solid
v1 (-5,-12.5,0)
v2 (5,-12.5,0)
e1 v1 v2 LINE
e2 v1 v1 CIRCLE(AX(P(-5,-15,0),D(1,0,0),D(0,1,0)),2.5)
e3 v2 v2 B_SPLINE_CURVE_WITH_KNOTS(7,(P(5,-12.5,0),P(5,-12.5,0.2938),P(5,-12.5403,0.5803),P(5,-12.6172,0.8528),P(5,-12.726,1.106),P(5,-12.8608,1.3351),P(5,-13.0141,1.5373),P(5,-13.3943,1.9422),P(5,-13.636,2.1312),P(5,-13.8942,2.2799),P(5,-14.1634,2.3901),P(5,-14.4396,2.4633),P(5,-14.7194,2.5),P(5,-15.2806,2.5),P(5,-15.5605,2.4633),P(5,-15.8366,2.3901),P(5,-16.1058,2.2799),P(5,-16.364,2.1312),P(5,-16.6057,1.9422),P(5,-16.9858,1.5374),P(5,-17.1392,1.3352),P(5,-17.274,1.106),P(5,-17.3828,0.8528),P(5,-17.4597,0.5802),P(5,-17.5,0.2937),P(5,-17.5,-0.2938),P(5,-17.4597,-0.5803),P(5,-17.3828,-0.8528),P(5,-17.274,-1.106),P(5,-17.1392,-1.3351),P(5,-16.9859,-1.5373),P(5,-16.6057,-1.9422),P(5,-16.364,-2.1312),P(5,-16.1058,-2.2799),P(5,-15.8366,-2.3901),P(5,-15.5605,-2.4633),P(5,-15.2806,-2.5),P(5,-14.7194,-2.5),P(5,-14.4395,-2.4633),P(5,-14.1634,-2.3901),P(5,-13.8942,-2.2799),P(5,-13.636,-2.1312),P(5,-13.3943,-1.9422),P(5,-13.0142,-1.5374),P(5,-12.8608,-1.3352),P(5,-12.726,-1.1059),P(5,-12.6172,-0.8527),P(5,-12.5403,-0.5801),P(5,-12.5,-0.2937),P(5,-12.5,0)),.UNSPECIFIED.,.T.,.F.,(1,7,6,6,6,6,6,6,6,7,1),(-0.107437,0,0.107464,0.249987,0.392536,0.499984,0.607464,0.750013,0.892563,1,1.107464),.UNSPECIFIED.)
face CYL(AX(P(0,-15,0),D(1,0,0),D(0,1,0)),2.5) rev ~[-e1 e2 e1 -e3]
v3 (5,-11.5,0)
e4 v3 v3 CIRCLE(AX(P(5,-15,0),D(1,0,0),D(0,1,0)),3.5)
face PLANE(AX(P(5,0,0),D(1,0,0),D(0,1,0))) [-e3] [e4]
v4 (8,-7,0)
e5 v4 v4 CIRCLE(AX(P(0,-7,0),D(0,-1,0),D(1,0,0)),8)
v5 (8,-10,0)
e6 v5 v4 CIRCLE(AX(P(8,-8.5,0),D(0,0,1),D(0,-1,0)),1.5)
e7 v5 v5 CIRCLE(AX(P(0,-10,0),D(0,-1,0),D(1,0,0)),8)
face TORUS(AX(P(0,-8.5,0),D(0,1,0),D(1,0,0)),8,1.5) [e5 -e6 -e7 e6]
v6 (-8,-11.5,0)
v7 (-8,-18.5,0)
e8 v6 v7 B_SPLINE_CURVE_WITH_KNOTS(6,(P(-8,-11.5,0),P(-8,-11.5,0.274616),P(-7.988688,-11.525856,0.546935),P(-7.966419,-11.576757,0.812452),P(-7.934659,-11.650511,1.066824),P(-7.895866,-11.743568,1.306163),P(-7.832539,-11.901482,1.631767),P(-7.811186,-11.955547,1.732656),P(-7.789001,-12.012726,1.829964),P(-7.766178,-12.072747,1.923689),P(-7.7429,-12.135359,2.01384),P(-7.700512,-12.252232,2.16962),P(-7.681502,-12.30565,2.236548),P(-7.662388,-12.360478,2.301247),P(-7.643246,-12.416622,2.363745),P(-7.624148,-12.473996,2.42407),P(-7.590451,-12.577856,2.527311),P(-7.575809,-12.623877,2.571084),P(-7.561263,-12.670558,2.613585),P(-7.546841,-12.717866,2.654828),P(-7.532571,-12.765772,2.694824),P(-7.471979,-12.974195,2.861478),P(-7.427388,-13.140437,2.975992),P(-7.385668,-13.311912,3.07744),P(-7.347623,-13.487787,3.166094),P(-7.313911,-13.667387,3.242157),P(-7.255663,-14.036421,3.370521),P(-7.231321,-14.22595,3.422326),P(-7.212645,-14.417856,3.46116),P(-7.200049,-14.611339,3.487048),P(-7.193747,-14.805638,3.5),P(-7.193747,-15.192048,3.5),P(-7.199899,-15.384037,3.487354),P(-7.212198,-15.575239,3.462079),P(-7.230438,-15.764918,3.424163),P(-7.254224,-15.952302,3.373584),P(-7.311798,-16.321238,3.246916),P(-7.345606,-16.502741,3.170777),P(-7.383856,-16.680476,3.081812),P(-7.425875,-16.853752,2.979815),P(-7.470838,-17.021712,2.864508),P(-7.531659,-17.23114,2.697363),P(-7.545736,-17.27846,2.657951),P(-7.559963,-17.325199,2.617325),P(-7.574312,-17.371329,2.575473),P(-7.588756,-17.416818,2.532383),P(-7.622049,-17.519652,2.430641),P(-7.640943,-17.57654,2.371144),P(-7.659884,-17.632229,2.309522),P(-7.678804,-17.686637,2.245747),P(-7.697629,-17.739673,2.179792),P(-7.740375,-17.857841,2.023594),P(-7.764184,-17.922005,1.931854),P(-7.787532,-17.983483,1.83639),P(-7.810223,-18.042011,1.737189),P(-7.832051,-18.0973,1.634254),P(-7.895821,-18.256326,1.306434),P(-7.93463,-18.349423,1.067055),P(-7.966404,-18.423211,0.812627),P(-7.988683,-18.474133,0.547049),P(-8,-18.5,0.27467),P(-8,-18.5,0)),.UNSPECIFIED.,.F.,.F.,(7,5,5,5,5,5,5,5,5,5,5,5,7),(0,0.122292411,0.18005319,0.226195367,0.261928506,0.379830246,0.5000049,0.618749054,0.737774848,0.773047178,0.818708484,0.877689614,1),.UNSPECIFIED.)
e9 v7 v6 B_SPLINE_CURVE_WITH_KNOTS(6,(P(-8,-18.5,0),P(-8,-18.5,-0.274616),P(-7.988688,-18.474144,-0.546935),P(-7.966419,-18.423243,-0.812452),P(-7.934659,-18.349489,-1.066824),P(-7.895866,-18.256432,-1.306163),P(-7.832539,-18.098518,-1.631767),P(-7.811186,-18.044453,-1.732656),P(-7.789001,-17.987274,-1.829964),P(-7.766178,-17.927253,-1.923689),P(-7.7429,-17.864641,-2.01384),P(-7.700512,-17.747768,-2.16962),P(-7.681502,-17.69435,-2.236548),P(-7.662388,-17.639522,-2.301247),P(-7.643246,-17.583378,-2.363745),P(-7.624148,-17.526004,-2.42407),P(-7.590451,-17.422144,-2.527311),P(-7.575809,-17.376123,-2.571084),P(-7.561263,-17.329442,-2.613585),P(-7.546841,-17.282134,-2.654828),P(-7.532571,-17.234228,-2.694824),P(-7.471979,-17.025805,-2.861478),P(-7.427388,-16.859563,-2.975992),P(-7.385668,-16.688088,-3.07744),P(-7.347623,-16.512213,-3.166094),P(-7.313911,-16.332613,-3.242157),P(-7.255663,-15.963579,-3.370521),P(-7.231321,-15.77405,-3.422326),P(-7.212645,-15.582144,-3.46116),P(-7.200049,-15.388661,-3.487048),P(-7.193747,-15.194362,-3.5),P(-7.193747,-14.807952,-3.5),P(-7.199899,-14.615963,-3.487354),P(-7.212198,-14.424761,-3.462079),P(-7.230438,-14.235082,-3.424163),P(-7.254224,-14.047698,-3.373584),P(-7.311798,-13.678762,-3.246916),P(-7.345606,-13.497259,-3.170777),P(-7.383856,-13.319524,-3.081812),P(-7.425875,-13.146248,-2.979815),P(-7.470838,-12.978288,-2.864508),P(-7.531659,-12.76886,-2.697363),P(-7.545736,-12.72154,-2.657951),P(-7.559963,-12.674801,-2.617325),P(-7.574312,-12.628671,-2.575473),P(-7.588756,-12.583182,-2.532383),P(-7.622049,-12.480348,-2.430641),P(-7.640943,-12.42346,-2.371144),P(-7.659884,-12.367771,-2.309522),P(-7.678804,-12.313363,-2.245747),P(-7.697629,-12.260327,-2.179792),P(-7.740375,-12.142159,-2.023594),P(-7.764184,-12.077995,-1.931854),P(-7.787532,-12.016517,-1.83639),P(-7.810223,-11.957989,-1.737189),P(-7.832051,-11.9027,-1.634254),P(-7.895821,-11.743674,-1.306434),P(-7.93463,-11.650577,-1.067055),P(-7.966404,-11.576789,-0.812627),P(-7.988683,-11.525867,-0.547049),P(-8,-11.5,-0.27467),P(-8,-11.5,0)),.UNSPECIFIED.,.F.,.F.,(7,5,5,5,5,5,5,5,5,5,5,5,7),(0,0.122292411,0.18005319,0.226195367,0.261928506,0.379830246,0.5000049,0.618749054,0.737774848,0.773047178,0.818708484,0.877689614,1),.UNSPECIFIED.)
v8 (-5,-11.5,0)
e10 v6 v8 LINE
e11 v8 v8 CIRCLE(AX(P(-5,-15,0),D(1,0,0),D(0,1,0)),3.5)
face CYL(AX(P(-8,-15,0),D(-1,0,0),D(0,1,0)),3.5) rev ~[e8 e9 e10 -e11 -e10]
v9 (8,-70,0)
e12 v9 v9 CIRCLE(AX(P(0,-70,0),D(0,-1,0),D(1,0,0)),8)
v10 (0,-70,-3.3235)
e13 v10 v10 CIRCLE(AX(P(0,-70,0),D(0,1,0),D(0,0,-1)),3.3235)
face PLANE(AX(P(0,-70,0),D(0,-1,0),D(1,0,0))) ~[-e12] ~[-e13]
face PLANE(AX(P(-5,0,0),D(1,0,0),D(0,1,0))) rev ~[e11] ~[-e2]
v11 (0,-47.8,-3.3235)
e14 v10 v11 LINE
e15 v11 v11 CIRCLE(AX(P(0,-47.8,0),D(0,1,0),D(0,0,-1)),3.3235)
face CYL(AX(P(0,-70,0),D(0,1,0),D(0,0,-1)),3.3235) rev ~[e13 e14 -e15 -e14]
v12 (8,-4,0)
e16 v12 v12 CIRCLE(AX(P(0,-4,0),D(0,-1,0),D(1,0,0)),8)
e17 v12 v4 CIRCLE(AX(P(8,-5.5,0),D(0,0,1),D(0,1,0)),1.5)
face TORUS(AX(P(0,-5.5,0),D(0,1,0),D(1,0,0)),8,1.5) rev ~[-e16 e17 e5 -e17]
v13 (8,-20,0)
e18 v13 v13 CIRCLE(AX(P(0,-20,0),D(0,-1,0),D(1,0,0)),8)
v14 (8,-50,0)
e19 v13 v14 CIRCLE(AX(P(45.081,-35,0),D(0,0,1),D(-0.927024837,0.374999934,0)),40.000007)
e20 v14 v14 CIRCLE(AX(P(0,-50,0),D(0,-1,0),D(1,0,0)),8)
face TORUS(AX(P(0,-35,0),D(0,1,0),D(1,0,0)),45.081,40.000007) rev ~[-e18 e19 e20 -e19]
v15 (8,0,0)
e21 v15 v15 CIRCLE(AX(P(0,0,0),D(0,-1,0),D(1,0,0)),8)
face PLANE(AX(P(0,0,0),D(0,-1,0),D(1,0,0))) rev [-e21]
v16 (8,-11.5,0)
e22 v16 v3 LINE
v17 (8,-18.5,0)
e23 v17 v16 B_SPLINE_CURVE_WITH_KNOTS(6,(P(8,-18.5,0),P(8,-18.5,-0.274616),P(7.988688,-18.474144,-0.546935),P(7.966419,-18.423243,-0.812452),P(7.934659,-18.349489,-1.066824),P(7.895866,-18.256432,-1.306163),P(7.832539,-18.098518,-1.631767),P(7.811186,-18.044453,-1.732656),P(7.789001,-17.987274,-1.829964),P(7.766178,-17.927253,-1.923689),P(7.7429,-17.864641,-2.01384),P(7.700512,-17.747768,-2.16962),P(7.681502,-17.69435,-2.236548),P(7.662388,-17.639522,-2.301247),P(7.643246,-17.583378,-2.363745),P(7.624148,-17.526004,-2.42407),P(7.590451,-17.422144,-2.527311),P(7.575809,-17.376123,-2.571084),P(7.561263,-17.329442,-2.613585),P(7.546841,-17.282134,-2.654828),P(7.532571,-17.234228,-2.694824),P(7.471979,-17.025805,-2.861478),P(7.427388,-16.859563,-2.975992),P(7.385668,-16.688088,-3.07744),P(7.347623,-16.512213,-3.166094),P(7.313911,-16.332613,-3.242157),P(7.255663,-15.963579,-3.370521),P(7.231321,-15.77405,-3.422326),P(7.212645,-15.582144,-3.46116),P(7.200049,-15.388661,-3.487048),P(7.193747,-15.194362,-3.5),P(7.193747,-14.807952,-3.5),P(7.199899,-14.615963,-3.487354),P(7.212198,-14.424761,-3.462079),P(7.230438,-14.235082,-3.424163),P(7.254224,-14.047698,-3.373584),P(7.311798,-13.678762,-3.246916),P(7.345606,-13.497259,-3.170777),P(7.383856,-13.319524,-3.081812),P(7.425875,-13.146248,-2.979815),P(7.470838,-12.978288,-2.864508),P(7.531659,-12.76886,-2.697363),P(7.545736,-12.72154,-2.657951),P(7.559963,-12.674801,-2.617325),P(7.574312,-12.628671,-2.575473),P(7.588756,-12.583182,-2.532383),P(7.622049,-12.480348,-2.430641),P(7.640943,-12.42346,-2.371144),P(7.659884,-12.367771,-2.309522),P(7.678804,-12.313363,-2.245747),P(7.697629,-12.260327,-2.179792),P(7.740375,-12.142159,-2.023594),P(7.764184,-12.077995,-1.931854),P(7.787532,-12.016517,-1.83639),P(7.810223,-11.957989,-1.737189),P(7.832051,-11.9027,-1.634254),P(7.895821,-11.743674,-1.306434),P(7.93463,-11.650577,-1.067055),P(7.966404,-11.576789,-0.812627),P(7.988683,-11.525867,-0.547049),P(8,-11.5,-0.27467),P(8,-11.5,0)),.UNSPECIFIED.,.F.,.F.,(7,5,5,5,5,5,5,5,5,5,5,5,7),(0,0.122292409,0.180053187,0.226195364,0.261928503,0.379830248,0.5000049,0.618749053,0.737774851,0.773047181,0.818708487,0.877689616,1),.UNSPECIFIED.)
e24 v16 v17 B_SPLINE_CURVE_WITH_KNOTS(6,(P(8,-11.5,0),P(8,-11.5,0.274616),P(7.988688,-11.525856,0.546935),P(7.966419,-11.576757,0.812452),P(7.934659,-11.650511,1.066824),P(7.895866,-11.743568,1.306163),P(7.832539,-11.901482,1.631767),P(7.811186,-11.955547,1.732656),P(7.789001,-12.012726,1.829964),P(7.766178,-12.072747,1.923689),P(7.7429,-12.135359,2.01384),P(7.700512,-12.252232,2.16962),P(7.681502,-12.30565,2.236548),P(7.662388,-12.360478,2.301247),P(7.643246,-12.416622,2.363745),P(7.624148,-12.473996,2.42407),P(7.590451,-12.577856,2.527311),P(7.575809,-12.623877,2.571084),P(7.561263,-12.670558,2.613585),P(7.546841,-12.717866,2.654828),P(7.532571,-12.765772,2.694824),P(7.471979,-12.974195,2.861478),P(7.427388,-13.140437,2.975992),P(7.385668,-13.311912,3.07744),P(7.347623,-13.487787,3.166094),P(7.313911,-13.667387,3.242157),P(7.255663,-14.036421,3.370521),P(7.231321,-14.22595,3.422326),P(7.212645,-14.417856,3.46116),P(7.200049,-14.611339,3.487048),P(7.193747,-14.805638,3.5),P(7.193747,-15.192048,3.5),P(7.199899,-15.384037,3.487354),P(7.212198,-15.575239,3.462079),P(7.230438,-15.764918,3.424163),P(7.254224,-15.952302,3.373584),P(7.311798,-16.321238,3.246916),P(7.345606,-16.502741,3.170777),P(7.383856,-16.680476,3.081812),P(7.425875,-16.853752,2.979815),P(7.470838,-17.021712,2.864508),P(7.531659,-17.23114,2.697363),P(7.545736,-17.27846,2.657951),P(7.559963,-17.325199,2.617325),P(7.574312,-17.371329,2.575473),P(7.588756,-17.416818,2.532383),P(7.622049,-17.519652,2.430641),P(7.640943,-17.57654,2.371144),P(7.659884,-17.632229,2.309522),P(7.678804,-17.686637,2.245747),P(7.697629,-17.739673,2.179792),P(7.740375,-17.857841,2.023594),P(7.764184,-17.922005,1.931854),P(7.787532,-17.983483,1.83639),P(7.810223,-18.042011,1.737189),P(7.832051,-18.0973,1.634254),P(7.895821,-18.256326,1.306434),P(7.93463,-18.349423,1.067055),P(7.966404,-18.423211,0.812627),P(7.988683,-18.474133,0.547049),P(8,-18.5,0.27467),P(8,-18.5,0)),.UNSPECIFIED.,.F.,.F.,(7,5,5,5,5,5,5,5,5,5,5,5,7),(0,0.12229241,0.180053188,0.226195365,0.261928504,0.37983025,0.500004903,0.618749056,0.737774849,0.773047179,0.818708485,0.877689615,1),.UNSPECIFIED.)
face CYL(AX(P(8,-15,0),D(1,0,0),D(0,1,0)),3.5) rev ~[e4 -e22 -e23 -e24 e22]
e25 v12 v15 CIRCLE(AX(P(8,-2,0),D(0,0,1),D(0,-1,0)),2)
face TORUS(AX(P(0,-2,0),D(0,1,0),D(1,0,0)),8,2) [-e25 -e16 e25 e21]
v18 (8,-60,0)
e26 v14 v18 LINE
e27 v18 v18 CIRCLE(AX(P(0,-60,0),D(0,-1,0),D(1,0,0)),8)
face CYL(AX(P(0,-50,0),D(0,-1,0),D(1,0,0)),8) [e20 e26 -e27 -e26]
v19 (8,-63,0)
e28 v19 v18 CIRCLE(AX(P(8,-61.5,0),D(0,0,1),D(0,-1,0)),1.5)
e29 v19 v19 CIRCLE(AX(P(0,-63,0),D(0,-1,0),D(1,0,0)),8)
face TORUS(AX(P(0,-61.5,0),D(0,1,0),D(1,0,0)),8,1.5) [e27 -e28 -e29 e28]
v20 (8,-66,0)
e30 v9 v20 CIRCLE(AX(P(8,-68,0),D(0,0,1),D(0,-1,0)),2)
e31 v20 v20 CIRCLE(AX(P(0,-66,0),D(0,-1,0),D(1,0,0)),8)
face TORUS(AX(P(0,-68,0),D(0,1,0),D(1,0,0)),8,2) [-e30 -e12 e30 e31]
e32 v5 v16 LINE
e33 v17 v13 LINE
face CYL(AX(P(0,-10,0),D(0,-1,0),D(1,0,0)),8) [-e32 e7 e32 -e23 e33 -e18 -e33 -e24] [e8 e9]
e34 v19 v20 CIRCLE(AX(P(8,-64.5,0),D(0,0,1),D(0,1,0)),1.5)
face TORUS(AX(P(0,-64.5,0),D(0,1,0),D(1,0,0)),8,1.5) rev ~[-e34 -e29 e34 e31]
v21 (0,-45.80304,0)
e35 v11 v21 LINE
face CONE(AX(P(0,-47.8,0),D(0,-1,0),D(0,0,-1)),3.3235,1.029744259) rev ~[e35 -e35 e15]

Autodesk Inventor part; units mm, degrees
ref_plane "XZ Plane" through (0, 0, 0) normal (0, 1, 0) x (-1, 0, 0)
sketch "Sketch1" plane through (0, 0, 0) normal (0, 0, 1) x (1, 0, 0)
  line L0 (0, 0) -> (0, -70)
  line L1 (0, 0) -> (8, 0)
  line L2 (8, 0) -> (8, -4) construction
  arc A0 (8, -4) -> (8, 0) centre (8, -2) ccw
  arc A1 (8, -4) -> (8, -7) centre (8, -5.5) ccw
  line L3 (8, -5.5) -> (4.7369, -5.5) construction
  arc A2 (8, -10) -> (8, -7) centre (8, -8.5) ccw
  line L4 (0, -70) -> (8, -70)
  line L5 (8, -70) -> (8, -66) construction
  arc A3 (8, -70) -> (8, -66) centre (8, -68) ccw
  arc A4 (8, -63) -> (8, -66) centre (8, -64.5) ccw
  arc A5 (8, -63) -> (8, -60) centre (8, -61.5) ccw
  arc A6 (8, -20) -> (8, -50) centre (45.081, -35) ccw
  line L6 (8, -10) -> (8, -20)
  line L7 (8, -50) -> (8, -60)
  dimension "d1" = 10
  dimension "d2" = 4
  dimension "d3" = 1.5
  dimension "d4" = 3
  dimension "d5" = 3
  dimension "d6" = 1.5
  dimension "d7" = 4
  dimension "d8" = 10
  dimension "d9" = 1.5
  dimension "d10" = 3
  dimension "d11" = 3
  dimension "d12" = 1.5
  dimension "d16" = 20
  dimension "d17" = 20
  dimension "d18" = 40
  dimension "d19" = 10
  dimension "d20" = 10
revolve "Revolution1" add sketch "Sketch1" angle 360 about axis through (0, 0, 0) along (0, -1, 0)
sketch "Sketch2" plane through (0, 0, 0) normal (1, 0, 0) x (0, 1, 0)
  circle A0 centre (-15, 0) radius 2.5
  line L0 (-70, 8) -> (-70, -8) projected
  point P0 (0, 0)
  dimension "d14" = 55
  dimension "d15" = 5
extrude "Extrusion1" cut sketch "Sketch2" against normal mid plane 20
ref_plane "Work Plane1" through (8, 0, 0) normal (1, 0, 0) x (0, 1, 0)
sketch "Sketch3" plane through (8, 0, 0) normal (1, 0, 0) x (0, 1, 0)
  spline S0 degree 7 poles (-12.5, 0) (-12.5, 0.2938) (-12.5403, 0.5803) (-12.6172, 0.8528) (-12.726, 1.106) (-12.8608, 1.3351) (-13.0141, 1.5373) (-13.3943, 1.9422) (-13.636, 2.1312) (-13.8942, 2.2799) (-14.1634, 2.3901) (-14.4396, 2.4633) (-14.7194, 2.5) (-15.2806, 2.5) (-15.5605, 2.4633) (-15.8366, 2.3901) (-16.1058, 2.2799) (-16.364, 2.1312) (-16.6057, 1.9422) (-16.9858, 1.5374) (-17.1392, 1.3352) (-17.274, 1.106) (-17.3828, 0.8528) (-17.4597, 0.5802) (-17.5, 0.2937) (-17.5, -0.2938) (-17.4597, -0.5803) (-17.3828, -0.8528) (-17.274, -1.106) (-17.1392, -1.3351) (-16.9859, -1.5373) (-16.6057, -1.9422) (-16.364, -2.1312) (-16.1058, -2.2799) (-15.8366, -2.3901) (-15.5605, -2.4633) (-15.2806, -2.5) (-14.7194, -2.5) (-14.4395, -2.4633) (-14.1634, -2.3901) (-13.8942, -2.2799) (-13.636, -2.1312) (-13.3943, -1.9422) (-13.0142, -1.5374) (-12.8608, -1.3352) (-12.726, -1.1059) (-12.6172, -0.8527) (-12.5403, -0.5801) (-12.5, -0.2937) (-12.5, 0) knots 0 0 0 0 0 0 0 0 0.107464 0.107464 0.107464 0.107464 0.107464 0.107464 0.249987 0.249987 0.249987 0.249987 0.249987 0.249987 0.392536 0.392536 0.392536 0.392536 0.392536 0.392536 0.499984 0.499984 0.499984 0.499984 0.499984 0.499984 0.607464 0.607464 0.607464 0.607464 0.607464 0.607464 0.750013 0.750013 0.750013 0.750013 0.750013 0.750013 0.892563 0.892563 0.892563 0.892563 0.892563 0.892563 1 1 1 1 1 1 1 1 projected
  circle A0 centre (-15, 0) radius 3.5
  line L0 (-70, 8) -> (-70, -8) projected
  point P0 (0, 0)
  dimension "d24" = 7
  dimension "d25" = 55
extrude "Extrusion2" cut sketch "Sketch3" against normal blind 3
ref_plane "Work Plane2" through (-8, 0, 0) normal (1, 0, 0) x (0, 1, 0)
sketch "Sketch4" plane through (-8, 0, 0) normal (1, 0, 0) x (0, 1, 0)
  circle A0 centre (-15, 0) radius 2.5 projected
  circle A1 centre (-15, 0) radius 3.5
  point P0 (0, 0)
  dimension "d29" = 7
extrude "Extrusion3" cut sketch "Sketch4" along normal blind 3
sketch "Sketch5" plane through (0, -70, 0) normal (0, -1, 0) x (1, 0, 0)
  point P0 (0, 0)
  point P1 (0, 0)
hole "Hole1" at (0, -70, 0) direction (0, 1, 0) diameter 6.647 depth 22.2 tip angle 118 thread size "M8x1.25" class "6H" standard "ISO Metric profile"
properties part number "Wheel Shaft Pillar" material "Stainless Steel"
